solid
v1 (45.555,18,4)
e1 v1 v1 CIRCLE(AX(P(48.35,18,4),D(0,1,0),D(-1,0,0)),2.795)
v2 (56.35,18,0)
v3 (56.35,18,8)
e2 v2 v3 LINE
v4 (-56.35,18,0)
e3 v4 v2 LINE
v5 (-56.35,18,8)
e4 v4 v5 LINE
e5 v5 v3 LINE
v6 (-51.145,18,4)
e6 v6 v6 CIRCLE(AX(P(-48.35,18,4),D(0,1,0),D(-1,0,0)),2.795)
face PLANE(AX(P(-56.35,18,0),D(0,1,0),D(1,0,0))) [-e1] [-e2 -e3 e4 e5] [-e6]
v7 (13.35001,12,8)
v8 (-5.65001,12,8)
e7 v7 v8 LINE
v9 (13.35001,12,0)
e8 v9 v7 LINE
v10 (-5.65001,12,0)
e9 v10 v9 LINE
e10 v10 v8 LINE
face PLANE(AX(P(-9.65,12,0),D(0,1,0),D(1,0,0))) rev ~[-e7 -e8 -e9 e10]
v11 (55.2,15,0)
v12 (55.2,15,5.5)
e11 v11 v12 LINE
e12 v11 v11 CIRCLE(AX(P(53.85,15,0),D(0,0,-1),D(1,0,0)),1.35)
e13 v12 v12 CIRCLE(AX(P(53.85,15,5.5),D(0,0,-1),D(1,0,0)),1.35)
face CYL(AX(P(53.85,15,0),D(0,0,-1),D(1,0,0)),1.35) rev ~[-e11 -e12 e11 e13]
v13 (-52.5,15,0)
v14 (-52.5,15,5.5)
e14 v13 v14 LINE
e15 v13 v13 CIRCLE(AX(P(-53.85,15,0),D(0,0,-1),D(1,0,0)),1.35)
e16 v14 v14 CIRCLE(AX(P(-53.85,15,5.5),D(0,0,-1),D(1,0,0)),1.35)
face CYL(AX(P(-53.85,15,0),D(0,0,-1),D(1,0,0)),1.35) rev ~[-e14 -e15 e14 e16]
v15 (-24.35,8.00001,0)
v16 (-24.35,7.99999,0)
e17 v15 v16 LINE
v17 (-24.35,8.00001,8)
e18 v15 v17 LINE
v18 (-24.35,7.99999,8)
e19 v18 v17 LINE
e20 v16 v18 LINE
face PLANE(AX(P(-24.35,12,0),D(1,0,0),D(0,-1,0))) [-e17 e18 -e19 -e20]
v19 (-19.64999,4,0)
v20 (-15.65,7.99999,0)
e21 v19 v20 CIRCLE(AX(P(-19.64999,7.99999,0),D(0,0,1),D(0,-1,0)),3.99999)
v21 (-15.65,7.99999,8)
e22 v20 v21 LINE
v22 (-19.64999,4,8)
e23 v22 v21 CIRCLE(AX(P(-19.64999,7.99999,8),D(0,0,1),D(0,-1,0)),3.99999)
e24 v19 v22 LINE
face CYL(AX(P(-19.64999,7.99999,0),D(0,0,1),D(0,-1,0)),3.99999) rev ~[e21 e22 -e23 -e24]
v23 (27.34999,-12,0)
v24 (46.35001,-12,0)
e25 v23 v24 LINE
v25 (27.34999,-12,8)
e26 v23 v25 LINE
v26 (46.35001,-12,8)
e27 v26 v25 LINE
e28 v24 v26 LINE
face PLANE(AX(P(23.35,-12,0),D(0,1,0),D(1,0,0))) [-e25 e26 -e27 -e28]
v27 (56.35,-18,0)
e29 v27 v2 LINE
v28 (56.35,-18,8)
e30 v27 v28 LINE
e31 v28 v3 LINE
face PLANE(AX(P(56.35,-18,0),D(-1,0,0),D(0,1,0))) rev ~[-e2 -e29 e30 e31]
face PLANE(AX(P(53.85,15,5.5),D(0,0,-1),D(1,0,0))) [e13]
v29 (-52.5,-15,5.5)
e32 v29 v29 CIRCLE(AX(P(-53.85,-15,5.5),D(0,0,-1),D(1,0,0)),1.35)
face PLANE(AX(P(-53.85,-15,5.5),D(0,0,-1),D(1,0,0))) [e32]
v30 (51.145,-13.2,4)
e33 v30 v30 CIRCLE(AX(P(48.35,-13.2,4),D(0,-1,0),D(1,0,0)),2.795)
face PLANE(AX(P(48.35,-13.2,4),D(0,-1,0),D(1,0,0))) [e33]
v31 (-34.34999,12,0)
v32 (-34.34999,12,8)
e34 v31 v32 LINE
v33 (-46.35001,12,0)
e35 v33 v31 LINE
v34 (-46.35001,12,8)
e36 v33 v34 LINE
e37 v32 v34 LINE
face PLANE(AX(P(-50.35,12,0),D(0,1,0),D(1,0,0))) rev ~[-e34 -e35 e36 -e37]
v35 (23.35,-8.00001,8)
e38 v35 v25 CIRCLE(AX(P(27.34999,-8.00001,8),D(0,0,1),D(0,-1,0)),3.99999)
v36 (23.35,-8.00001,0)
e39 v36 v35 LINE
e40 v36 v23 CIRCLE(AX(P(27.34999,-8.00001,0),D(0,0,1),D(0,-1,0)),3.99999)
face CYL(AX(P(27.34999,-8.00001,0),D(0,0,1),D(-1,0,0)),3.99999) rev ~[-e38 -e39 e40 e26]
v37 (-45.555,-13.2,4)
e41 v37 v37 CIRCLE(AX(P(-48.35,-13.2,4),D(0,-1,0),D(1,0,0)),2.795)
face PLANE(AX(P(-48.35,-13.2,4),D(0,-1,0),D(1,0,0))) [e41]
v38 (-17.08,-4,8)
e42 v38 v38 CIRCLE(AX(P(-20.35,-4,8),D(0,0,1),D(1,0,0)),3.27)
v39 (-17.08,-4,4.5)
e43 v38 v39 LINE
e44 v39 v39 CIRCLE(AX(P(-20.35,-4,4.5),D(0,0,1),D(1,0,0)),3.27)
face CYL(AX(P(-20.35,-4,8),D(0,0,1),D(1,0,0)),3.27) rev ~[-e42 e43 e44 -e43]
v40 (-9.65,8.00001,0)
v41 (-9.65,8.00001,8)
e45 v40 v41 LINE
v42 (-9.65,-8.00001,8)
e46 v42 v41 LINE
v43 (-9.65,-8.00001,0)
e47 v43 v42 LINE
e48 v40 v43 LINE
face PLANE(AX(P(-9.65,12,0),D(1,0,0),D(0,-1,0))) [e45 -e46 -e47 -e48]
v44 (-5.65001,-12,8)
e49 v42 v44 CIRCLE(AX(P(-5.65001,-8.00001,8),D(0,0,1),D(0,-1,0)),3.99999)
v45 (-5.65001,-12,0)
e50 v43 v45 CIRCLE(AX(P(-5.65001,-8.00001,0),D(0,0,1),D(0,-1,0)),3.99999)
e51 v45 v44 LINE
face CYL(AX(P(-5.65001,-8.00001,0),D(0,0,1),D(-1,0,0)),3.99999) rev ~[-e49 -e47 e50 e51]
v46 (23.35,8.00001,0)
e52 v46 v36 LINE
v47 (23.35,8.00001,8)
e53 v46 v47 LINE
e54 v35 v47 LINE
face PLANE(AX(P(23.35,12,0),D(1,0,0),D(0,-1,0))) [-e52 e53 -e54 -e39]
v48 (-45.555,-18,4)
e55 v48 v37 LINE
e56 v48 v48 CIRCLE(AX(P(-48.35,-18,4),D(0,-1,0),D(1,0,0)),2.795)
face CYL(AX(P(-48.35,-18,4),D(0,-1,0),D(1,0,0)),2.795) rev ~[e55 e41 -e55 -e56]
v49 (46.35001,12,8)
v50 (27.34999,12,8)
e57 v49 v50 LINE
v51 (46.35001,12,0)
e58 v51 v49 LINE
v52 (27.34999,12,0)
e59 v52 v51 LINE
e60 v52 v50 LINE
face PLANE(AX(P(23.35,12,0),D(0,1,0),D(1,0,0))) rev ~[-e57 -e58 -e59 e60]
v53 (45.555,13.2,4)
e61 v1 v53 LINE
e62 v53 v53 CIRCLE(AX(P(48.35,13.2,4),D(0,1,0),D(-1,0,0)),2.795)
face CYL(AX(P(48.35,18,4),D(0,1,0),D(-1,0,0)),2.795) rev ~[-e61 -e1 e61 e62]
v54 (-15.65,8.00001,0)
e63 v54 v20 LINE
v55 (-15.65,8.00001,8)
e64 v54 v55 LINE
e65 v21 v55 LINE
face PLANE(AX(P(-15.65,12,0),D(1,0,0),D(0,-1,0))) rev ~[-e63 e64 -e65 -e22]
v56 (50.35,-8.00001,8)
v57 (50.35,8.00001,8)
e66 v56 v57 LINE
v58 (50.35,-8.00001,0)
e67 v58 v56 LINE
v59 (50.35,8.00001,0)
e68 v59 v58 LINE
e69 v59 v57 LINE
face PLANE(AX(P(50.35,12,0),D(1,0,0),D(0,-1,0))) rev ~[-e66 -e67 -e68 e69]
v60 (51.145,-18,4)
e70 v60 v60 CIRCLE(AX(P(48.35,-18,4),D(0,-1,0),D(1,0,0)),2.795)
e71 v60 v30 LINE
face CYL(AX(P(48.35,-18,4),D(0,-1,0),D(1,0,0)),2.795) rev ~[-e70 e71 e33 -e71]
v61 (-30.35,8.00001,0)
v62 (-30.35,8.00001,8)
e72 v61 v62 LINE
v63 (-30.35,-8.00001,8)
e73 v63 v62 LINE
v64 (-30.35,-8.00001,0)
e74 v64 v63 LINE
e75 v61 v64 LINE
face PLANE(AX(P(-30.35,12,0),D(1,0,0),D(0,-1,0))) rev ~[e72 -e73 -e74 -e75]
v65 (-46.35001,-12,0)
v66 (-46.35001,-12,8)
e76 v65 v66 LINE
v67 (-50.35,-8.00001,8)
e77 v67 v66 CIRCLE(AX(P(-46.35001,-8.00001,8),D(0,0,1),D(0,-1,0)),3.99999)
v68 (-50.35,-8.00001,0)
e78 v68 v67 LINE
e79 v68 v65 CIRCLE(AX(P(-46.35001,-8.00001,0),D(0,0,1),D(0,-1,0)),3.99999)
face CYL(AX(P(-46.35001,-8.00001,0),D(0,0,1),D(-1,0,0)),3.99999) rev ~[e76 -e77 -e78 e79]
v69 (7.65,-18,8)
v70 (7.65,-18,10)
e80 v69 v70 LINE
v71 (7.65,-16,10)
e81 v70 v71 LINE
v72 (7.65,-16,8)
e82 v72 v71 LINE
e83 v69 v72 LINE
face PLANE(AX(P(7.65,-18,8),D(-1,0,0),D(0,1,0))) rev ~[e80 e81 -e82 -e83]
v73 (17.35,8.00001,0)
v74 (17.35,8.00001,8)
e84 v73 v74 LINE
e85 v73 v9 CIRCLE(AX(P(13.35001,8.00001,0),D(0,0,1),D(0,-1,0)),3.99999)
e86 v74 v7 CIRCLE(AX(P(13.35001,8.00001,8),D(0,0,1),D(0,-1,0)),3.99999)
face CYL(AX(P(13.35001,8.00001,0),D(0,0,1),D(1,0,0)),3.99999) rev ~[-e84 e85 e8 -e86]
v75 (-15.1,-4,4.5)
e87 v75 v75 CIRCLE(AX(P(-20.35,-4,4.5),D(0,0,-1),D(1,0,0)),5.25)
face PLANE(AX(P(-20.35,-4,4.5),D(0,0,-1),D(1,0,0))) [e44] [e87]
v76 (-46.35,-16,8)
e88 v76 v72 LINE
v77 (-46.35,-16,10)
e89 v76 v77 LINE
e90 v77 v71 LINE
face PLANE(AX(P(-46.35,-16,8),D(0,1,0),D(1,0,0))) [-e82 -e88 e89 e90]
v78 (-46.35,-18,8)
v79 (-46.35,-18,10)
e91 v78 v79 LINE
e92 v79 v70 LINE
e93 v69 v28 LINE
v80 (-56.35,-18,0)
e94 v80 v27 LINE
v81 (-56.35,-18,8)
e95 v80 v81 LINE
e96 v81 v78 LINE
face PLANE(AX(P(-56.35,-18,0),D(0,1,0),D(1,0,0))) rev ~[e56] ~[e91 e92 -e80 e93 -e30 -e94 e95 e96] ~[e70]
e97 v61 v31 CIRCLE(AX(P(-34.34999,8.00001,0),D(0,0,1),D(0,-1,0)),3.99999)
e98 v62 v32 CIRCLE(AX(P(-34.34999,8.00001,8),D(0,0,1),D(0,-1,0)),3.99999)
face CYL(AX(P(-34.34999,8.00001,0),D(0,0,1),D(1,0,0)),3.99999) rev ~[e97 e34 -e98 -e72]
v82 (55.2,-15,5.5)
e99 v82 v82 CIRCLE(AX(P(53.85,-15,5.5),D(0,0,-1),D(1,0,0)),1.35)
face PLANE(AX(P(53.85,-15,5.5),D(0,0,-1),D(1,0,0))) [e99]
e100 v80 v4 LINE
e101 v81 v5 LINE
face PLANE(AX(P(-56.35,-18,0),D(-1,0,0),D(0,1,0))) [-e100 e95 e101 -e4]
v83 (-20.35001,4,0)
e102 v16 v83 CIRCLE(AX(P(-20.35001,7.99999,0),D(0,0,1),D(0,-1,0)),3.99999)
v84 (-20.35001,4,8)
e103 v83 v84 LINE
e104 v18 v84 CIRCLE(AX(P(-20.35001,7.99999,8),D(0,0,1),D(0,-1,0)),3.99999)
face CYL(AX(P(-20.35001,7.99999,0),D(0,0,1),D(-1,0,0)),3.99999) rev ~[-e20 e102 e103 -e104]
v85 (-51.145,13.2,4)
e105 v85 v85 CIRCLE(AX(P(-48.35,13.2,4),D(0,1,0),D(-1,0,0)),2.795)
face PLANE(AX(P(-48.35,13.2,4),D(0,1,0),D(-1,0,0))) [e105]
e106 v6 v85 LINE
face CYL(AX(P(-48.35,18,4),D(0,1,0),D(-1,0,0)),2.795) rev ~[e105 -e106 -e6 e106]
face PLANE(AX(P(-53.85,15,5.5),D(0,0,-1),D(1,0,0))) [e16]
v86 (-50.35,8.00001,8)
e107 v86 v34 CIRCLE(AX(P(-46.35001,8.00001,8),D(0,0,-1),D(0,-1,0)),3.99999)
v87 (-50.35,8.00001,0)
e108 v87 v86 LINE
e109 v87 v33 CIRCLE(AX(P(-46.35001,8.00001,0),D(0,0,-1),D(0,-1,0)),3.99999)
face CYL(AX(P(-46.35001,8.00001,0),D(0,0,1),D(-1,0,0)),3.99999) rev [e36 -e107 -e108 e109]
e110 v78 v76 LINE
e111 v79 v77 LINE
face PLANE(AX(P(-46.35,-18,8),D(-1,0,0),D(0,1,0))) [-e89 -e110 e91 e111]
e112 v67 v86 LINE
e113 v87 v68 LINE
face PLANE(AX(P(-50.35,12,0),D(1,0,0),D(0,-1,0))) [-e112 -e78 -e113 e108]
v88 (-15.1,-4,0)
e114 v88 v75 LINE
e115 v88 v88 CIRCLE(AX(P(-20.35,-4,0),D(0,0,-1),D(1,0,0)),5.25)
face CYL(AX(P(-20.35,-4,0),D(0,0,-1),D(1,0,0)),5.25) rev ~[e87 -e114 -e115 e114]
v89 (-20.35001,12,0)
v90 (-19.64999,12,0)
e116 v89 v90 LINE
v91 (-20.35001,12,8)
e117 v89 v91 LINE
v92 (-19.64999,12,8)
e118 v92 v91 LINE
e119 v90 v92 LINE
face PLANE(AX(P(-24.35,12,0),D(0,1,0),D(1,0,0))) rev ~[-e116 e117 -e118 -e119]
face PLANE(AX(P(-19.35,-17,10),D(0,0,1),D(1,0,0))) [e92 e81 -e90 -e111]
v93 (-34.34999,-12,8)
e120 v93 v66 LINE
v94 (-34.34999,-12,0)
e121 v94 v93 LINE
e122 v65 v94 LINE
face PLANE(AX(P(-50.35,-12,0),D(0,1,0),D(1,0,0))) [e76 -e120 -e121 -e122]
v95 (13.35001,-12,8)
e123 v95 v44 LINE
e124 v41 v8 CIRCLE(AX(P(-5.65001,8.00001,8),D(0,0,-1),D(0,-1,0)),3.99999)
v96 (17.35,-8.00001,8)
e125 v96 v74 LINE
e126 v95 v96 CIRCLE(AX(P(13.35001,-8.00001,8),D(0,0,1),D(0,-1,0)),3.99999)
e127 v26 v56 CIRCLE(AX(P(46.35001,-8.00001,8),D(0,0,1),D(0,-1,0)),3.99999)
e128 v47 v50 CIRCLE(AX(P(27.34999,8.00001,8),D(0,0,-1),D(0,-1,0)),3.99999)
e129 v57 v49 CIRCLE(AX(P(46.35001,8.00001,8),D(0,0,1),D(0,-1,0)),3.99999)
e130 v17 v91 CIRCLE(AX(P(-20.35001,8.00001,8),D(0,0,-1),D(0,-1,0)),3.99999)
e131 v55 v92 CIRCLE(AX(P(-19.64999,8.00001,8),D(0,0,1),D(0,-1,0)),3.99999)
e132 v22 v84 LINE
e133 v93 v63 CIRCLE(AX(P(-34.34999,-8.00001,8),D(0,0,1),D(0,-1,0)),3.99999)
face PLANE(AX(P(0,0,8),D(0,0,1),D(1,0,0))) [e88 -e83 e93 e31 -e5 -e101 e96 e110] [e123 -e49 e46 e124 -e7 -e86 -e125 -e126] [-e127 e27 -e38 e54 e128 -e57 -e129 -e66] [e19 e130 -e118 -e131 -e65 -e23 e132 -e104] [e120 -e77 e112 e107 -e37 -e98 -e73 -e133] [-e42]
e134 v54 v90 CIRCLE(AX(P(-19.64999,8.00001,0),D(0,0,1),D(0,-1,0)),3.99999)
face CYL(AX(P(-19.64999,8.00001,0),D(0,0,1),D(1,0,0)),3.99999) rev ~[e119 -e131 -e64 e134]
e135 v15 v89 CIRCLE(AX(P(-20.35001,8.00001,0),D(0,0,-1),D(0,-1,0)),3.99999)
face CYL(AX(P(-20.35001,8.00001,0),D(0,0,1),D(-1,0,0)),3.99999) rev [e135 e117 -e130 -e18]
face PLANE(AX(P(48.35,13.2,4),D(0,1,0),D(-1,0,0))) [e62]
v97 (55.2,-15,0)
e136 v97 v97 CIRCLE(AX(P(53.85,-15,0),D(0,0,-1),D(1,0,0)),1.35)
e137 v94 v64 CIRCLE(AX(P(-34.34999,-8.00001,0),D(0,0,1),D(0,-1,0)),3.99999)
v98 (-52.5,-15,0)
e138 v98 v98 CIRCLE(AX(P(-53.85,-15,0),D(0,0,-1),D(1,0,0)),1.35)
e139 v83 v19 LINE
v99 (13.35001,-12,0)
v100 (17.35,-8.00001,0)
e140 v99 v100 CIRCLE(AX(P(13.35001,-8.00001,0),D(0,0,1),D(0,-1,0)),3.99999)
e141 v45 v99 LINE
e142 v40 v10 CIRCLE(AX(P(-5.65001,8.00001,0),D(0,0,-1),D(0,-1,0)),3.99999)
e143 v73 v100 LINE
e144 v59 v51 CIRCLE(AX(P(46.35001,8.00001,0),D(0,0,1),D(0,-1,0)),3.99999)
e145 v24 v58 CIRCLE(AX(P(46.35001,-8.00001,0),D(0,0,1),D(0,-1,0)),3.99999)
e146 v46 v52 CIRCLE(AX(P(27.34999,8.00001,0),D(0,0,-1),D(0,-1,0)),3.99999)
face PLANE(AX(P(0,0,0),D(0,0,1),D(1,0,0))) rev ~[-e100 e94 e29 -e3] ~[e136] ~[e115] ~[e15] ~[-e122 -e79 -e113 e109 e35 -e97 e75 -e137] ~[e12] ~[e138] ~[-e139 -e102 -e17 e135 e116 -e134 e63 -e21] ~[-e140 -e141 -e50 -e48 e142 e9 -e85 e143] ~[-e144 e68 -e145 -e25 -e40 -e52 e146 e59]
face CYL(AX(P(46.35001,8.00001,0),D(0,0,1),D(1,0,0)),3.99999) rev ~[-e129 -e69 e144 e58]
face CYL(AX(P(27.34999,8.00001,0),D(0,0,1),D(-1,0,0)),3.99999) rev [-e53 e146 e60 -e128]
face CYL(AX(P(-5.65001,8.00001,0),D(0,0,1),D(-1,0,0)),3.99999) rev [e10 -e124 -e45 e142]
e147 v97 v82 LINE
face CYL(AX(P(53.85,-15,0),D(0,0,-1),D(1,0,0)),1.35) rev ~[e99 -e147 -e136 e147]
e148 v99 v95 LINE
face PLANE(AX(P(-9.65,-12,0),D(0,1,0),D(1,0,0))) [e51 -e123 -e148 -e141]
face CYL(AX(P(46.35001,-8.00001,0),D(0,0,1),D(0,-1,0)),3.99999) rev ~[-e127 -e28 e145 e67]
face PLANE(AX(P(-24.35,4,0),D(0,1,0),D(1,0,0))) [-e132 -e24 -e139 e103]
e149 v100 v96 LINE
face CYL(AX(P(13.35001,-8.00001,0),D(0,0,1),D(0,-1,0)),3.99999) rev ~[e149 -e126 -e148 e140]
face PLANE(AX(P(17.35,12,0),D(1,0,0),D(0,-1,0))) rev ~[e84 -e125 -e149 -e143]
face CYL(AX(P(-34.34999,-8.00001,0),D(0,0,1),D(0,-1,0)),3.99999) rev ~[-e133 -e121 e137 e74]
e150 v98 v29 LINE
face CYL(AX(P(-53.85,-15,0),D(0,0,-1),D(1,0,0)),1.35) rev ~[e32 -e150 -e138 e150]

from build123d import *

# Parameters (mm, degrees)
F0_W      = 112.7
F0_H      = 36
F1_DEPTH  = 8
F3_W      = 54
F3_H      = 2
F4_DEPTH  = 2
F5_R      = 3.27
F6_DEPTH  = 8.001
F7_R      = 1.35
F8_DEPTH  = 5.5
F10_R     = 5.25
F11_DEPTH = 4.5
F9_W      = 20
F9_H      = 24
F9_W_2    = 27
F9_W_3    = 8.7
F9_H_2    = 8
F12_DEPTH = 10.001
F13_R     = 3.99999
F14_R     = 2.795
F15_DEPTH = 4.8
F16_R     = 2.795
F17_DEPTH = 4.8


# Not quite as in the source:
# - a fillet or chamfer is up to 0.001 mm smaller than in the source, because OpenCascade refuses the exact size


with BuildPart() as f1:
    # F0 (on Top) → F1 (new body)
    with BuildSketch(Plane.XY):
        Rectangle(F0_W, F0_H)
    extrude(amount=F1_DEPTH)

    # F3 (on face) → F4 (join)
    with BuildSketch(Plane.XY.offset(8)):
        with Locations((-19.35, -17)):
            Rectangle(F3_W, F3_H)
    extrude(amount=F4_DEPTH)

    # F5 (on face) → F6 (cut, through all)
    with BuildSketch(Plane.XY.offset(8)):
        with Locations((-20.35, -4)):
            Circle(F5_R)
    extrude(amount=-F6_DEPTH, mode=Mode.SUBTRACT)

    # F7 (on face) → F8 (cut)
    with BuildSketch(Plane(origin=(0, 0, 0), x_dir=(1, 0, 0), z_dir=(0, 0, -1))):
        with Locations((-53.85, 15)):
            Circle(F7_R)
        with Locations((-53.85, -15)):
            Circle(F7_R)
        with Locations((53.85, 15)):
            Circle(F7_R)
        with Locations((53.85, -15)):
            Circle(F7_R)
    extrude(amount=-F8_DEPTH, mode=Mode.SUBTRACT)

    # F10 (on face) → F11 (cut)
    with BuildSketch(Plane(origin=(0, 0, 0), x_dir=(1, 0, 0), z_dir=(0, 0, -1))):
        with Locations((-20.35, 4)):
            Circle(F10_R)
    extrude(amount=-F11_DEPTH, mode=Mode.SUBTRACT)

    # F9 (on face) → F12 (cut, through all)
    with BuildSketch(Plane(origin=(0, 0, 0), x_dir=(1, 0, 0), z_dir=(0, 0, -1))):
        with Locations((-40.35, 0)):
            Rectangle(F9_W, F9_H)
        with Locations((3.85, 0)):
            Rectangle(F9_W_2, F9_H)
        with Locations((36.85, 0)):
            Rectangle(F9_W_2, F9_H)
        with Locations((-20, -8)):
            Rectangle(F9_W_3, F9_H_2)
    extrude(amount=-F12_DEPTH, mode=Mode.SUBTRACT)

    # F13 (radius 4 in the source; OpenCascade refuses exactly that, so slightly less here)
    f13_edges = [f1.edges().sort_by_distance(p)[0] for p in [
        (-30.35, -12, 4),
        (-50.35, -12, 4),
        (-50.35, 12, 4),
        (-30.35, 12, 4),
        (-24.35, 4, 4),
        (-9.65, -12, 4),
        (23.35, -12, 4),
        (-9.65, 12, 4),
        (-24.35, 12, 4),
        (17.35, -12, 4),
        (50.35, -12, 4),
        (50.35, 12, 4),
        (23.35, 12, 4),
        (-15.65, 4, 4),
        (-15.65, 12, 4),
        (17.35, 12, 4),
    ]]
    fillet(f13_edges, radius=F13_R)

    # F14 (on face) → F15 (cut)
    with BuildSketch(Plane.XZ.offset(18)):
        with Locations((48.35, 4)):
            Circle(F14_R)
        with Locations((-48.35, 4)):
            Circle(F14_R)
    extrude(amount=-F15_DEPTH, mode=Mode.SUBTRACT)

    # F16 (on face) → F17 (cut)
    with BuildSketch(Plane(origin=(0, 18, 0), x_dir=(-1, 0, 0), z_dir=(0, 1, 0))):
        with Locations((48.35, 4)):
            Circle(F16_R)
        with Locations((-48.35, 4)):
            Circle(F16_R)
    extrude(amount=-F17_DEPTH, mode=Mode.SUBTRACT)


solid = f1.part
